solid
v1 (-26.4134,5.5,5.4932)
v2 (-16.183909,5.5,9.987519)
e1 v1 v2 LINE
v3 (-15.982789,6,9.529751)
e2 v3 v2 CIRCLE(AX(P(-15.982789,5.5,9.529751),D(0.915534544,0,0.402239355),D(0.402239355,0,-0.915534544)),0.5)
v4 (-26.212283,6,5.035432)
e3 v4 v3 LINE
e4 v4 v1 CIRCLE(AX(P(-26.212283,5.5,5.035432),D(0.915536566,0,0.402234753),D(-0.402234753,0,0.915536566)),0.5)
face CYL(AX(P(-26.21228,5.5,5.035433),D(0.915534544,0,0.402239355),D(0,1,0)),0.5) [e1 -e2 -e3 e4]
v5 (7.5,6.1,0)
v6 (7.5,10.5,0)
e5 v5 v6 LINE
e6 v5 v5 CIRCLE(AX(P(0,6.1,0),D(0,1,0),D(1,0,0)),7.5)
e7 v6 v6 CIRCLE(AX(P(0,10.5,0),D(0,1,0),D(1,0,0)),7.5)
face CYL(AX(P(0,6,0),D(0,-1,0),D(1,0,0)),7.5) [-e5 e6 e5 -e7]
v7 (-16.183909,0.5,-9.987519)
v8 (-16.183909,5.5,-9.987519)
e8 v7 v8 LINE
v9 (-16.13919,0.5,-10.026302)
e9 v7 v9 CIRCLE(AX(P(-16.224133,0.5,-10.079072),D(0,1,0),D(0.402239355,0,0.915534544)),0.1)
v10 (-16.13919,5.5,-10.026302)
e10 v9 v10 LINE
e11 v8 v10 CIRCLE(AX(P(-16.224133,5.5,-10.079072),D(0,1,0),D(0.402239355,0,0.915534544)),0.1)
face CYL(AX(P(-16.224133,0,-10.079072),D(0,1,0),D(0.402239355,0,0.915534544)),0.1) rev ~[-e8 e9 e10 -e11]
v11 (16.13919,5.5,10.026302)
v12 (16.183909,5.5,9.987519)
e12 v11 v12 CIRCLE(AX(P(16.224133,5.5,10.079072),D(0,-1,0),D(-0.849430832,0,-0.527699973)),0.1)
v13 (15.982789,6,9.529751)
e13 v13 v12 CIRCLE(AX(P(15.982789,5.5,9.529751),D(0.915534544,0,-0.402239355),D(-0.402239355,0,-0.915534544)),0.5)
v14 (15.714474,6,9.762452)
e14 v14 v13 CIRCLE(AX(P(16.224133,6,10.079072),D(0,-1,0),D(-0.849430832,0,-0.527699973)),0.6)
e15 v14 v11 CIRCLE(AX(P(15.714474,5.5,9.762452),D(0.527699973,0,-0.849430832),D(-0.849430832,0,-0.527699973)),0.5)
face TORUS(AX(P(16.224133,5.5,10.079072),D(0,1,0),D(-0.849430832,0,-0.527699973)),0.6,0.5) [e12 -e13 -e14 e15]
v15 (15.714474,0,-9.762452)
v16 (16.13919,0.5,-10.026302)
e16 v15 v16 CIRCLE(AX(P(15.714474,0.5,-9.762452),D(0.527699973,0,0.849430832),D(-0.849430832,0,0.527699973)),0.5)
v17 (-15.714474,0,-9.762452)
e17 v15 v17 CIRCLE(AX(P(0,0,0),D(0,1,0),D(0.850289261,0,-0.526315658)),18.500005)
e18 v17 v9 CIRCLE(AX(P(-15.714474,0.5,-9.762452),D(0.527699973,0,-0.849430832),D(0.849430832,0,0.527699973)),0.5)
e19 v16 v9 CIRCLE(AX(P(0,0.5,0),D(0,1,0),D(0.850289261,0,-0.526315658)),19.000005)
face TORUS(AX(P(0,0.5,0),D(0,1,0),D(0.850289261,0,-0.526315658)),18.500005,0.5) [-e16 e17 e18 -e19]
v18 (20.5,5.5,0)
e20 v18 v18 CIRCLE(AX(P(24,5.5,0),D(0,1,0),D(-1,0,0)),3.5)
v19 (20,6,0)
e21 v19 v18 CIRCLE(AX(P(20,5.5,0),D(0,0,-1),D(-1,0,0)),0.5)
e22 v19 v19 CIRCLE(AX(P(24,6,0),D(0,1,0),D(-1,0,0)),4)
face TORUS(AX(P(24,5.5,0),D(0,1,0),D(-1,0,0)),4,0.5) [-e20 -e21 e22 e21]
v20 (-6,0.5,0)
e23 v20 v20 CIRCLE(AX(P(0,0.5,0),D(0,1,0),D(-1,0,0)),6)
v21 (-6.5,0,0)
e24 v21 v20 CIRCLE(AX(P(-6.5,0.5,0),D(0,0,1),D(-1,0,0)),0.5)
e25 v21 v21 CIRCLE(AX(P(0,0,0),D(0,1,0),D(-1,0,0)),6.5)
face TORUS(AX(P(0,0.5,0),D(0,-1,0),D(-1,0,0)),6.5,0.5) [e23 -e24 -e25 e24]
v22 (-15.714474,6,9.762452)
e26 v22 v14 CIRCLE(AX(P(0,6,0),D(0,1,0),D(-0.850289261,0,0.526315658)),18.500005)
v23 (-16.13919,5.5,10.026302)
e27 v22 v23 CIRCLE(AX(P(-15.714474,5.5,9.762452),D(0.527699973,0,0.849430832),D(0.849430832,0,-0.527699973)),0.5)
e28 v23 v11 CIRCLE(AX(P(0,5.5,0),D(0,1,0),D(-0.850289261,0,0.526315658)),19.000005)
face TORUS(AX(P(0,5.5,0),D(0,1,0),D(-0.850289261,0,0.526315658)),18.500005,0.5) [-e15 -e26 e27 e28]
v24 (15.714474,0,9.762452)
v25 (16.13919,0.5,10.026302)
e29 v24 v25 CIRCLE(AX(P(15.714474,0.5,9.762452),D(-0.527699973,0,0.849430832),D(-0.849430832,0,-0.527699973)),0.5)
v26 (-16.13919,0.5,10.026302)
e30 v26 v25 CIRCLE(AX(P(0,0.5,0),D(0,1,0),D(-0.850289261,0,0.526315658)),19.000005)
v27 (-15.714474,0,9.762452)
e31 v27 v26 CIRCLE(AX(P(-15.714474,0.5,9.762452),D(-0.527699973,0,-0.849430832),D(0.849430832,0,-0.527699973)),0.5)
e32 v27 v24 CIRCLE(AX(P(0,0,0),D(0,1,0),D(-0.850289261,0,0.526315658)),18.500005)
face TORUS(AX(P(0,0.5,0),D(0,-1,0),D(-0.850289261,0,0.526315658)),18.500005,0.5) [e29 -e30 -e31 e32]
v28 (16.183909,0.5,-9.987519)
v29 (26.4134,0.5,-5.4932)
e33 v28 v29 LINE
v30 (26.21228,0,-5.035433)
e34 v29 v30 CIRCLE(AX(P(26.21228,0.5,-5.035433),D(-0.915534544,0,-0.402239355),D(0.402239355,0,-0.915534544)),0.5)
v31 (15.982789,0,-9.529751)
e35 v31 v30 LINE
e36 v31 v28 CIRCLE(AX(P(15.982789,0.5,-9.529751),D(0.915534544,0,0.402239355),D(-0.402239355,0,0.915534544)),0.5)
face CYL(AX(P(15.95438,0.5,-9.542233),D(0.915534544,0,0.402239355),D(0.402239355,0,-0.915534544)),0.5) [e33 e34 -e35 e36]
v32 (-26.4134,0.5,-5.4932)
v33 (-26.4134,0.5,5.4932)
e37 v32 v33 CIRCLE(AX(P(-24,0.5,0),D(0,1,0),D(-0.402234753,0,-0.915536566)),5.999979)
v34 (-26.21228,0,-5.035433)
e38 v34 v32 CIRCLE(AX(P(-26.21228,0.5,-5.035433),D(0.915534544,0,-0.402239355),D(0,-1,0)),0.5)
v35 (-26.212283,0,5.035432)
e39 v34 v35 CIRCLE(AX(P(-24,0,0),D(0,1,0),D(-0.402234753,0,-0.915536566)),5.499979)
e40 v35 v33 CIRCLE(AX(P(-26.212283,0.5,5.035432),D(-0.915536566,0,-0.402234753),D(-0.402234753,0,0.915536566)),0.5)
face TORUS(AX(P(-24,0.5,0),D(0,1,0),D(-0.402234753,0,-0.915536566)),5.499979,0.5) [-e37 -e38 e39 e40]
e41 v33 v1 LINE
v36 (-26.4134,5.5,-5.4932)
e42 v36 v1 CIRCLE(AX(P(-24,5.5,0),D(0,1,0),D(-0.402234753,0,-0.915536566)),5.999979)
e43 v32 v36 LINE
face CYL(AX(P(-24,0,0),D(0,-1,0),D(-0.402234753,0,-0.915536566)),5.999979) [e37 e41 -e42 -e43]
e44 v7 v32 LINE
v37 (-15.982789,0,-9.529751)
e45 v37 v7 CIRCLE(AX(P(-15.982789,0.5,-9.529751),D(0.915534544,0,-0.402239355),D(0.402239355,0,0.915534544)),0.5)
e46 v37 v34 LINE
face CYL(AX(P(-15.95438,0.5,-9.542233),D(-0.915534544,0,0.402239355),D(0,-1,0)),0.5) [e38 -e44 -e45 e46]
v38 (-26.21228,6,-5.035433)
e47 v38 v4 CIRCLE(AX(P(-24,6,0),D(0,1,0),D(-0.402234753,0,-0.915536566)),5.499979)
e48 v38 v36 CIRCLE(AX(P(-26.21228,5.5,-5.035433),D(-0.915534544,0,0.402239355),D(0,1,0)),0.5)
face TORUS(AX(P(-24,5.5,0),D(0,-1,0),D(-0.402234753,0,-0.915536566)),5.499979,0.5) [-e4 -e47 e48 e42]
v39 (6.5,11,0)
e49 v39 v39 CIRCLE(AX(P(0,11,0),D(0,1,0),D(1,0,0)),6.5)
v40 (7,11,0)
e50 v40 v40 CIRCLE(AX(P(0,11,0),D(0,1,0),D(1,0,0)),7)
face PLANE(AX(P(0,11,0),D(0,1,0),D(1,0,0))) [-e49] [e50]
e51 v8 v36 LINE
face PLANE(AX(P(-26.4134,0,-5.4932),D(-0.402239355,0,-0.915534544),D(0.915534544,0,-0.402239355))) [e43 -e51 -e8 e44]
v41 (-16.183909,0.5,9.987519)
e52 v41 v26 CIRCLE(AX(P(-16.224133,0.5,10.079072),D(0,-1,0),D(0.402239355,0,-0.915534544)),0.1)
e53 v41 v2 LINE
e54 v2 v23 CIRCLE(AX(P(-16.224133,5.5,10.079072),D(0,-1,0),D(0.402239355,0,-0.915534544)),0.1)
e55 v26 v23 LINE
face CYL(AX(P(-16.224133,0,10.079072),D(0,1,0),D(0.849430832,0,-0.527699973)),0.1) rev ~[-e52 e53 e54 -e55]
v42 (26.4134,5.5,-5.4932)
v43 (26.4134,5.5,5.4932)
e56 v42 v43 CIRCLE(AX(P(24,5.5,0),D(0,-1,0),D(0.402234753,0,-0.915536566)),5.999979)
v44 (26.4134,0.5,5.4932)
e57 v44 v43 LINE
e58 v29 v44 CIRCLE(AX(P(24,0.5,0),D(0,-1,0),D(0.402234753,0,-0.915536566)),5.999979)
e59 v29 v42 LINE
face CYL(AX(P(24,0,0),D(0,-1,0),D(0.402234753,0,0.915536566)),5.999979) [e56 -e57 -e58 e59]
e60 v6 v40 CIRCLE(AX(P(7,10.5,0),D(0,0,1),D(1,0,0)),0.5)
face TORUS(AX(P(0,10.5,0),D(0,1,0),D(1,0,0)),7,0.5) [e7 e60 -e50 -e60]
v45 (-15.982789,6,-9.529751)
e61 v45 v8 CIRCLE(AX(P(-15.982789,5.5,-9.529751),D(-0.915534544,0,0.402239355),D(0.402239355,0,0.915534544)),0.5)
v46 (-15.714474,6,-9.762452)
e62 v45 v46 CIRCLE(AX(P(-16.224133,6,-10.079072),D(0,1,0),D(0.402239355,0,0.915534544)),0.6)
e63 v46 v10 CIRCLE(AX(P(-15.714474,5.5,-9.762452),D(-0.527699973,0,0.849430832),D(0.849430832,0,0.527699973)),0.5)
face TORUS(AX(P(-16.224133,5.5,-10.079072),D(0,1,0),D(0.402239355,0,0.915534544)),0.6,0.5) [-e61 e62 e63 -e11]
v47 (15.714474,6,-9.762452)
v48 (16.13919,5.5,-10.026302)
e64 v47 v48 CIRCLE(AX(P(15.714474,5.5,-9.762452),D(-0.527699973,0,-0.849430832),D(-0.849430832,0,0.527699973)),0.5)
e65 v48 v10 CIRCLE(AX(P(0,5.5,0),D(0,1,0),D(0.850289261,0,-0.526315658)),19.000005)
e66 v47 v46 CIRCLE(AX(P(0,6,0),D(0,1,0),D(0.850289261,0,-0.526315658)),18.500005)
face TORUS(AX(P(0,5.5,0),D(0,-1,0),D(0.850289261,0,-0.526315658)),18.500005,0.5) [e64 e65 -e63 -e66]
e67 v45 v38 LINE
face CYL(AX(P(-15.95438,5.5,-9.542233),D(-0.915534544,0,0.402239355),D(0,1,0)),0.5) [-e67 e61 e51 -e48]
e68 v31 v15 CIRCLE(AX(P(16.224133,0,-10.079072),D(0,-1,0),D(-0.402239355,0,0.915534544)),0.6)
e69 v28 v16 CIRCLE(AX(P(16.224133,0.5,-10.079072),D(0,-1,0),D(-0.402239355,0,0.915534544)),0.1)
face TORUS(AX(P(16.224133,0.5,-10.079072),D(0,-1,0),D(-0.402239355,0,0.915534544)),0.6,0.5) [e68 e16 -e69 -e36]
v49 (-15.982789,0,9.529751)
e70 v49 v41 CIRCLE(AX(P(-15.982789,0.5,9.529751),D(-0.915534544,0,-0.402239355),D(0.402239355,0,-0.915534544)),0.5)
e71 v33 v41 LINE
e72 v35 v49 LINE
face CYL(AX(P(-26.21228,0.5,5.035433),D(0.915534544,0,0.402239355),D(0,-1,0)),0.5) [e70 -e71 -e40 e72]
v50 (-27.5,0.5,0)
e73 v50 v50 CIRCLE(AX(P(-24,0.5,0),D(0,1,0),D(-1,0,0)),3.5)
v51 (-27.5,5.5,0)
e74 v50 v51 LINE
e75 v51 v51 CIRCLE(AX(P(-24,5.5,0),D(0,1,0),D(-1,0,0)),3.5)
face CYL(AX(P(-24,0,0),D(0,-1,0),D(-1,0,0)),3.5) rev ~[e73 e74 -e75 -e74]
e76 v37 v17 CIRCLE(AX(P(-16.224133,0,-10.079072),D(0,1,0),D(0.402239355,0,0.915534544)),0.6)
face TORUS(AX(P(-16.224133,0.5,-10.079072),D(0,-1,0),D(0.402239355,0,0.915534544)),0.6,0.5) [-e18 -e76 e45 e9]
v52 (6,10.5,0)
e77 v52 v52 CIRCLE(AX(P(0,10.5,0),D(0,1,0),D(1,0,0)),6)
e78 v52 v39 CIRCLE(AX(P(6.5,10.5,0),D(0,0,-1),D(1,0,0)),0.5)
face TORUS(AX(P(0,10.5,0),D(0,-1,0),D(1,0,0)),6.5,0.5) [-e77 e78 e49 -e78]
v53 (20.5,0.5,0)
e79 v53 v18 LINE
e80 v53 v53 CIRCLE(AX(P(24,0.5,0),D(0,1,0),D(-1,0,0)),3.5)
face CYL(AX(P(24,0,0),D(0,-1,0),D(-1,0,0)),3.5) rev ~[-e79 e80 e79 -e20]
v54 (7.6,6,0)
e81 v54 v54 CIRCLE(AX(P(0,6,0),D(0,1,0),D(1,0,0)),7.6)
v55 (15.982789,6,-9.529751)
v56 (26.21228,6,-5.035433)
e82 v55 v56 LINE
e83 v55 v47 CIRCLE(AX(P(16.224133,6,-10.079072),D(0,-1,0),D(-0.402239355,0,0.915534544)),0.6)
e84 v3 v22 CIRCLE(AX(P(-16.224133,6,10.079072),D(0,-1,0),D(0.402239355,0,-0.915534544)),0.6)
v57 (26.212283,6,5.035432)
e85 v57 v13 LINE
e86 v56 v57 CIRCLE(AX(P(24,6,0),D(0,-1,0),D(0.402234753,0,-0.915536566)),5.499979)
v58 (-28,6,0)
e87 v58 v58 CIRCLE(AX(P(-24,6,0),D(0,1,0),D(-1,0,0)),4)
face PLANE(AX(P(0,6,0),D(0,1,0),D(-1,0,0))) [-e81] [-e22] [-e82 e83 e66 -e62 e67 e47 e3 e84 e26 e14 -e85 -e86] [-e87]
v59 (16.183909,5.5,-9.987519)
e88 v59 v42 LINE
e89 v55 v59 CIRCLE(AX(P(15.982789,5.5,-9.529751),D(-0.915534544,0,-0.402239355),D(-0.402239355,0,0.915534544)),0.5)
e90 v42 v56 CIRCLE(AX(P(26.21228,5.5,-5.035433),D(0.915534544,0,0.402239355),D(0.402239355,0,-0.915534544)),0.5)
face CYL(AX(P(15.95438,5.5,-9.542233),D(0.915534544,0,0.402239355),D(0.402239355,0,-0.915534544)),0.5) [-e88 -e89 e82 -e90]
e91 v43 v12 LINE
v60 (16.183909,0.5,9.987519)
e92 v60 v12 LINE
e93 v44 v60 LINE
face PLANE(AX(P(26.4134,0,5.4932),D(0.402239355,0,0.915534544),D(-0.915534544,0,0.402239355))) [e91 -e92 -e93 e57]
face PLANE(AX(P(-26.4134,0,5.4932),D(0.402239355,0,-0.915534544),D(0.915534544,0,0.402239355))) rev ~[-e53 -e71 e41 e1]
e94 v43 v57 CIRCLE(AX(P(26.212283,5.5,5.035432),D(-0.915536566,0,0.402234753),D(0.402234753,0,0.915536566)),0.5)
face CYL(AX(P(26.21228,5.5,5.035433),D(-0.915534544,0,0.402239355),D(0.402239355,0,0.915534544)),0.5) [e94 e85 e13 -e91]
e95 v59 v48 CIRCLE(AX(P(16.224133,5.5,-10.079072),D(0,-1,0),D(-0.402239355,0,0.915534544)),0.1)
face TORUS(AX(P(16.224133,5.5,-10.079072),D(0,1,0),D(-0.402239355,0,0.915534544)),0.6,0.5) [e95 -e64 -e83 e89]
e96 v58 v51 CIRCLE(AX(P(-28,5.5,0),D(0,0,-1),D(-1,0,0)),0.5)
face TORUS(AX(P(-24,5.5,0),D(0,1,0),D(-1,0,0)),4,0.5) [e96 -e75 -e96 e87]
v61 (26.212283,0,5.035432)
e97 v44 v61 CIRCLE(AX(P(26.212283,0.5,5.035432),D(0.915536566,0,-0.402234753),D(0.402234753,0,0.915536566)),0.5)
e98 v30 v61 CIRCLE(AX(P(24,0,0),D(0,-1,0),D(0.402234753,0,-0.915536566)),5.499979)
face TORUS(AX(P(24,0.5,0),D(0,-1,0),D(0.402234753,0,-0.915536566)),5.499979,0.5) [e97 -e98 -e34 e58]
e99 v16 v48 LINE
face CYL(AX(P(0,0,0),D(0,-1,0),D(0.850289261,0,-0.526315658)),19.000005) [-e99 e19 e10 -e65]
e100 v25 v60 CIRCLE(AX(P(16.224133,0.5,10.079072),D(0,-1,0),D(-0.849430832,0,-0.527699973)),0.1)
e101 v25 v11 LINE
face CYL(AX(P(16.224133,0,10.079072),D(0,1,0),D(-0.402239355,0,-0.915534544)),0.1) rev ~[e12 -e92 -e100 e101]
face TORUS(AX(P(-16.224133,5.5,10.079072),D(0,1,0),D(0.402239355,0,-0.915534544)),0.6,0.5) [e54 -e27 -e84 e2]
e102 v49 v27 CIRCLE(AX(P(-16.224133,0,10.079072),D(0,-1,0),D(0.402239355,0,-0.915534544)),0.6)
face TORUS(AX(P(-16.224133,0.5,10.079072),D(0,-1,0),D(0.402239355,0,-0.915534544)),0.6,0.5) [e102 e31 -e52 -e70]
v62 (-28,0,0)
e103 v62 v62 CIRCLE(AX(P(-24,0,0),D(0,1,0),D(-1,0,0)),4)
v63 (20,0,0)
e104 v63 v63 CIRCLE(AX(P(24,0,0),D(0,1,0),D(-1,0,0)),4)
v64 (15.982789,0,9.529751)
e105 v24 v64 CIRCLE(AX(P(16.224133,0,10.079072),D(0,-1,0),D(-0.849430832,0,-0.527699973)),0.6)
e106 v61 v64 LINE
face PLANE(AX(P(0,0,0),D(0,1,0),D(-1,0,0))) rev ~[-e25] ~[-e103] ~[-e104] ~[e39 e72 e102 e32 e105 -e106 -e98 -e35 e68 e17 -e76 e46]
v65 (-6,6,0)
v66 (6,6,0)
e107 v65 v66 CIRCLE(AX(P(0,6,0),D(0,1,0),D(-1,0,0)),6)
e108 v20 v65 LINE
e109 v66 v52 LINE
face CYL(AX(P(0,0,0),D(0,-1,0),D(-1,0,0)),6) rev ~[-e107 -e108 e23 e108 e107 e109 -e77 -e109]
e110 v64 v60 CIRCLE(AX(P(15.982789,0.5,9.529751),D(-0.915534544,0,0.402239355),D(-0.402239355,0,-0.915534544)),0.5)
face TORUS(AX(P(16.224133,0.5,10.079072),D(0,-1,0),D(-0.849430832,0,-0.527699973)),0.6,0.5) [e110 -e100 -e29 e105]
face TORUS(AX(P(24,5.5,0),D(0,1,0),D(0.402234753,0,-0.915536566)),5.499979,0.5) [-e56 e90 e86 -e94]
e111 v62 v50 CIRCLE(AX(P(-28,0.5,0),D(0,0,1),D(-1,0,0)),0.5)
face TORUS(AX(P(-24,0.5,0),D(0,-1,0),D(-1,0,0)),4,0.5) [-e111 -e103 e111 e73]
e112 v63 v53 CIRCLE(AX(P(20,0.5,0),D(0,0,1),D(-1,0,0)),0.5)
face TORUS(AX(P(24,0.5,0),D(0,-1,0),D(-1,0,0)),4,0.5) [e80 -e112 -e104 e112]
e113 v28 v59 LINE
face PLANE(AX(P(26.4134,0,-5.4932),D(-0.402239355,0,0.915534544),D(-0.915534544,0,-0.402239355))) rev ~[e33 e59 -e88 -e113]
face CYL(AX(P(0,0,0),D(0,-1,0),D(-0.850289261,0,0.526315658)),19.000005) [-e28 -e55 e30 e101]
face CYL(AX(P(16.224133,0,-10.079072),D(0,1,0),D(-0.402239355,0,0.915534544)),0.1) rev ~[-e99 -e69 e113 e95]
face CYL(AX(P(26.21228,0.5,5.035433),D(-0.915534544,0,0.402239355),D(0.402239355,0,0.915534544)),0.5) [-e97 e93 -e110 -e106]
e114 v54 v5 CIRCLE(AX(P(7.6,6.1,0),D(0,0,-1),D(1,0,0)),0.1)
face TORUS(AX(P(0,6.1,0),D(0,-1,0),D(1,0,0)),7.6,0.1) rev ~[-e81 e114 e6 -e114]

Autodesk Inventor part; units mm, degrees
ref_plane "YZ Plane" through (0, 0, 0) normal (1, 0, 0) x (0, 1, 0)
ref_plane "XZ Plane" through (0, 0, 0) normal (0, 1, 0) x (-1, 0, 0)
ref_plane "XY Plane" through (0, 0, 0) normal (0, 0, 1) x (1, 0, 0)
sketch "Sketch1" plane through (0, 0, 0) normal (0, 1, 0) x (-1, 0, 0)
  circle A0 centre (24, 0) radius 3.5
  circle A1 centre (-24, 0) radius 3.5
  arc A2 (-26.4134, 5.4932) -> (-26.4134, -5.4932) centre (-24, 0) ccw
  arc A3 (26.4134, -5.4932) -> (26.4134, 5.4932) centre (24, 0) ccw
  line L0 (26.4134, 5.4932) -> (16.1555, 10)
  line L1 (26.4134, -5.4932) -> (16.1555, -10)
  line L2 (-26.4134, 5.4932) -> (-16.1555, 10)
  line L3 (-26.4134, -5.4932) -> (-16.1555, -10)
  arc A4 (16.1555, 10) -> (-16.1555, 10) centre (0, 0) ccw
  arc A5 (-16.1555, -10) -> (16.1555, -10) centre (0, 0) ccw
  circle A6 centre (0, 0) radius 6
  dimension "d1" = 7
  dimension "d2" = 7
  dimension "d3" = 48
  dimension "d4" = 24
  dimension "d5" = 12
  dimension "d6" = 12
  dimension "d7" = 20
  dimension "d8" = 20
  dimension "d9" = 19
  dimension "d10" = 19
  dimension "d11" = 12
extrude "Extrusion1" add sketch "Sketch1" along normal blind 6
sketch "Sketch2" plane through (0, 6, 0) normal (0, 1, 0) x (1, 0, 0)
  circle A0 centre (0, 0) radius 7.5
  circle A1 centre (0, 0) radius 6
  dimension "d14" = 15
extrude "Extrusion2" add sketch "Sketch2" along normal blind 5
fillet "Fillet1" radius 0.5 23 edges at (-21.2845, 0, 7.7466) (-21.2845, 6, 7.7466) (0, 0, 19) (0, 6, 19) (-30, 0, 0) (-30, 6, 0) (21.2845, 0, 7.7466) (-21.2845, 0, -7.7466) (30, 0, 0) (0, 0, -19) (21.2845, 0, -7.7466) (27.5, 0, 0) (6, 0, 0) (-20.5, 0, 0) (21.2845, 6, 7.7466) (-21.2845, 6, -7.7466) (30, 6, 0) (0, 6, -19) (21.2845, 6, -7.7466) (27.5, 6, 0) (-20.5, 6, 0) (-6, 11, 0) (-7.5, 11, 0)
fillet "Fillet1" radius 0.1 5 edges at (-16.1555, 3, 10) (16.1555, 3, 10) (-7.5, 6, 0) (-16.1555, 3, -10) (16.1555, 3, -10)
equation "\"d4\" = 0.5 * d3"
equation "\"d8\" = d7"
equation "\"d10\" = d9"
properties part number "bloklager" material "Aluminum 6061"
